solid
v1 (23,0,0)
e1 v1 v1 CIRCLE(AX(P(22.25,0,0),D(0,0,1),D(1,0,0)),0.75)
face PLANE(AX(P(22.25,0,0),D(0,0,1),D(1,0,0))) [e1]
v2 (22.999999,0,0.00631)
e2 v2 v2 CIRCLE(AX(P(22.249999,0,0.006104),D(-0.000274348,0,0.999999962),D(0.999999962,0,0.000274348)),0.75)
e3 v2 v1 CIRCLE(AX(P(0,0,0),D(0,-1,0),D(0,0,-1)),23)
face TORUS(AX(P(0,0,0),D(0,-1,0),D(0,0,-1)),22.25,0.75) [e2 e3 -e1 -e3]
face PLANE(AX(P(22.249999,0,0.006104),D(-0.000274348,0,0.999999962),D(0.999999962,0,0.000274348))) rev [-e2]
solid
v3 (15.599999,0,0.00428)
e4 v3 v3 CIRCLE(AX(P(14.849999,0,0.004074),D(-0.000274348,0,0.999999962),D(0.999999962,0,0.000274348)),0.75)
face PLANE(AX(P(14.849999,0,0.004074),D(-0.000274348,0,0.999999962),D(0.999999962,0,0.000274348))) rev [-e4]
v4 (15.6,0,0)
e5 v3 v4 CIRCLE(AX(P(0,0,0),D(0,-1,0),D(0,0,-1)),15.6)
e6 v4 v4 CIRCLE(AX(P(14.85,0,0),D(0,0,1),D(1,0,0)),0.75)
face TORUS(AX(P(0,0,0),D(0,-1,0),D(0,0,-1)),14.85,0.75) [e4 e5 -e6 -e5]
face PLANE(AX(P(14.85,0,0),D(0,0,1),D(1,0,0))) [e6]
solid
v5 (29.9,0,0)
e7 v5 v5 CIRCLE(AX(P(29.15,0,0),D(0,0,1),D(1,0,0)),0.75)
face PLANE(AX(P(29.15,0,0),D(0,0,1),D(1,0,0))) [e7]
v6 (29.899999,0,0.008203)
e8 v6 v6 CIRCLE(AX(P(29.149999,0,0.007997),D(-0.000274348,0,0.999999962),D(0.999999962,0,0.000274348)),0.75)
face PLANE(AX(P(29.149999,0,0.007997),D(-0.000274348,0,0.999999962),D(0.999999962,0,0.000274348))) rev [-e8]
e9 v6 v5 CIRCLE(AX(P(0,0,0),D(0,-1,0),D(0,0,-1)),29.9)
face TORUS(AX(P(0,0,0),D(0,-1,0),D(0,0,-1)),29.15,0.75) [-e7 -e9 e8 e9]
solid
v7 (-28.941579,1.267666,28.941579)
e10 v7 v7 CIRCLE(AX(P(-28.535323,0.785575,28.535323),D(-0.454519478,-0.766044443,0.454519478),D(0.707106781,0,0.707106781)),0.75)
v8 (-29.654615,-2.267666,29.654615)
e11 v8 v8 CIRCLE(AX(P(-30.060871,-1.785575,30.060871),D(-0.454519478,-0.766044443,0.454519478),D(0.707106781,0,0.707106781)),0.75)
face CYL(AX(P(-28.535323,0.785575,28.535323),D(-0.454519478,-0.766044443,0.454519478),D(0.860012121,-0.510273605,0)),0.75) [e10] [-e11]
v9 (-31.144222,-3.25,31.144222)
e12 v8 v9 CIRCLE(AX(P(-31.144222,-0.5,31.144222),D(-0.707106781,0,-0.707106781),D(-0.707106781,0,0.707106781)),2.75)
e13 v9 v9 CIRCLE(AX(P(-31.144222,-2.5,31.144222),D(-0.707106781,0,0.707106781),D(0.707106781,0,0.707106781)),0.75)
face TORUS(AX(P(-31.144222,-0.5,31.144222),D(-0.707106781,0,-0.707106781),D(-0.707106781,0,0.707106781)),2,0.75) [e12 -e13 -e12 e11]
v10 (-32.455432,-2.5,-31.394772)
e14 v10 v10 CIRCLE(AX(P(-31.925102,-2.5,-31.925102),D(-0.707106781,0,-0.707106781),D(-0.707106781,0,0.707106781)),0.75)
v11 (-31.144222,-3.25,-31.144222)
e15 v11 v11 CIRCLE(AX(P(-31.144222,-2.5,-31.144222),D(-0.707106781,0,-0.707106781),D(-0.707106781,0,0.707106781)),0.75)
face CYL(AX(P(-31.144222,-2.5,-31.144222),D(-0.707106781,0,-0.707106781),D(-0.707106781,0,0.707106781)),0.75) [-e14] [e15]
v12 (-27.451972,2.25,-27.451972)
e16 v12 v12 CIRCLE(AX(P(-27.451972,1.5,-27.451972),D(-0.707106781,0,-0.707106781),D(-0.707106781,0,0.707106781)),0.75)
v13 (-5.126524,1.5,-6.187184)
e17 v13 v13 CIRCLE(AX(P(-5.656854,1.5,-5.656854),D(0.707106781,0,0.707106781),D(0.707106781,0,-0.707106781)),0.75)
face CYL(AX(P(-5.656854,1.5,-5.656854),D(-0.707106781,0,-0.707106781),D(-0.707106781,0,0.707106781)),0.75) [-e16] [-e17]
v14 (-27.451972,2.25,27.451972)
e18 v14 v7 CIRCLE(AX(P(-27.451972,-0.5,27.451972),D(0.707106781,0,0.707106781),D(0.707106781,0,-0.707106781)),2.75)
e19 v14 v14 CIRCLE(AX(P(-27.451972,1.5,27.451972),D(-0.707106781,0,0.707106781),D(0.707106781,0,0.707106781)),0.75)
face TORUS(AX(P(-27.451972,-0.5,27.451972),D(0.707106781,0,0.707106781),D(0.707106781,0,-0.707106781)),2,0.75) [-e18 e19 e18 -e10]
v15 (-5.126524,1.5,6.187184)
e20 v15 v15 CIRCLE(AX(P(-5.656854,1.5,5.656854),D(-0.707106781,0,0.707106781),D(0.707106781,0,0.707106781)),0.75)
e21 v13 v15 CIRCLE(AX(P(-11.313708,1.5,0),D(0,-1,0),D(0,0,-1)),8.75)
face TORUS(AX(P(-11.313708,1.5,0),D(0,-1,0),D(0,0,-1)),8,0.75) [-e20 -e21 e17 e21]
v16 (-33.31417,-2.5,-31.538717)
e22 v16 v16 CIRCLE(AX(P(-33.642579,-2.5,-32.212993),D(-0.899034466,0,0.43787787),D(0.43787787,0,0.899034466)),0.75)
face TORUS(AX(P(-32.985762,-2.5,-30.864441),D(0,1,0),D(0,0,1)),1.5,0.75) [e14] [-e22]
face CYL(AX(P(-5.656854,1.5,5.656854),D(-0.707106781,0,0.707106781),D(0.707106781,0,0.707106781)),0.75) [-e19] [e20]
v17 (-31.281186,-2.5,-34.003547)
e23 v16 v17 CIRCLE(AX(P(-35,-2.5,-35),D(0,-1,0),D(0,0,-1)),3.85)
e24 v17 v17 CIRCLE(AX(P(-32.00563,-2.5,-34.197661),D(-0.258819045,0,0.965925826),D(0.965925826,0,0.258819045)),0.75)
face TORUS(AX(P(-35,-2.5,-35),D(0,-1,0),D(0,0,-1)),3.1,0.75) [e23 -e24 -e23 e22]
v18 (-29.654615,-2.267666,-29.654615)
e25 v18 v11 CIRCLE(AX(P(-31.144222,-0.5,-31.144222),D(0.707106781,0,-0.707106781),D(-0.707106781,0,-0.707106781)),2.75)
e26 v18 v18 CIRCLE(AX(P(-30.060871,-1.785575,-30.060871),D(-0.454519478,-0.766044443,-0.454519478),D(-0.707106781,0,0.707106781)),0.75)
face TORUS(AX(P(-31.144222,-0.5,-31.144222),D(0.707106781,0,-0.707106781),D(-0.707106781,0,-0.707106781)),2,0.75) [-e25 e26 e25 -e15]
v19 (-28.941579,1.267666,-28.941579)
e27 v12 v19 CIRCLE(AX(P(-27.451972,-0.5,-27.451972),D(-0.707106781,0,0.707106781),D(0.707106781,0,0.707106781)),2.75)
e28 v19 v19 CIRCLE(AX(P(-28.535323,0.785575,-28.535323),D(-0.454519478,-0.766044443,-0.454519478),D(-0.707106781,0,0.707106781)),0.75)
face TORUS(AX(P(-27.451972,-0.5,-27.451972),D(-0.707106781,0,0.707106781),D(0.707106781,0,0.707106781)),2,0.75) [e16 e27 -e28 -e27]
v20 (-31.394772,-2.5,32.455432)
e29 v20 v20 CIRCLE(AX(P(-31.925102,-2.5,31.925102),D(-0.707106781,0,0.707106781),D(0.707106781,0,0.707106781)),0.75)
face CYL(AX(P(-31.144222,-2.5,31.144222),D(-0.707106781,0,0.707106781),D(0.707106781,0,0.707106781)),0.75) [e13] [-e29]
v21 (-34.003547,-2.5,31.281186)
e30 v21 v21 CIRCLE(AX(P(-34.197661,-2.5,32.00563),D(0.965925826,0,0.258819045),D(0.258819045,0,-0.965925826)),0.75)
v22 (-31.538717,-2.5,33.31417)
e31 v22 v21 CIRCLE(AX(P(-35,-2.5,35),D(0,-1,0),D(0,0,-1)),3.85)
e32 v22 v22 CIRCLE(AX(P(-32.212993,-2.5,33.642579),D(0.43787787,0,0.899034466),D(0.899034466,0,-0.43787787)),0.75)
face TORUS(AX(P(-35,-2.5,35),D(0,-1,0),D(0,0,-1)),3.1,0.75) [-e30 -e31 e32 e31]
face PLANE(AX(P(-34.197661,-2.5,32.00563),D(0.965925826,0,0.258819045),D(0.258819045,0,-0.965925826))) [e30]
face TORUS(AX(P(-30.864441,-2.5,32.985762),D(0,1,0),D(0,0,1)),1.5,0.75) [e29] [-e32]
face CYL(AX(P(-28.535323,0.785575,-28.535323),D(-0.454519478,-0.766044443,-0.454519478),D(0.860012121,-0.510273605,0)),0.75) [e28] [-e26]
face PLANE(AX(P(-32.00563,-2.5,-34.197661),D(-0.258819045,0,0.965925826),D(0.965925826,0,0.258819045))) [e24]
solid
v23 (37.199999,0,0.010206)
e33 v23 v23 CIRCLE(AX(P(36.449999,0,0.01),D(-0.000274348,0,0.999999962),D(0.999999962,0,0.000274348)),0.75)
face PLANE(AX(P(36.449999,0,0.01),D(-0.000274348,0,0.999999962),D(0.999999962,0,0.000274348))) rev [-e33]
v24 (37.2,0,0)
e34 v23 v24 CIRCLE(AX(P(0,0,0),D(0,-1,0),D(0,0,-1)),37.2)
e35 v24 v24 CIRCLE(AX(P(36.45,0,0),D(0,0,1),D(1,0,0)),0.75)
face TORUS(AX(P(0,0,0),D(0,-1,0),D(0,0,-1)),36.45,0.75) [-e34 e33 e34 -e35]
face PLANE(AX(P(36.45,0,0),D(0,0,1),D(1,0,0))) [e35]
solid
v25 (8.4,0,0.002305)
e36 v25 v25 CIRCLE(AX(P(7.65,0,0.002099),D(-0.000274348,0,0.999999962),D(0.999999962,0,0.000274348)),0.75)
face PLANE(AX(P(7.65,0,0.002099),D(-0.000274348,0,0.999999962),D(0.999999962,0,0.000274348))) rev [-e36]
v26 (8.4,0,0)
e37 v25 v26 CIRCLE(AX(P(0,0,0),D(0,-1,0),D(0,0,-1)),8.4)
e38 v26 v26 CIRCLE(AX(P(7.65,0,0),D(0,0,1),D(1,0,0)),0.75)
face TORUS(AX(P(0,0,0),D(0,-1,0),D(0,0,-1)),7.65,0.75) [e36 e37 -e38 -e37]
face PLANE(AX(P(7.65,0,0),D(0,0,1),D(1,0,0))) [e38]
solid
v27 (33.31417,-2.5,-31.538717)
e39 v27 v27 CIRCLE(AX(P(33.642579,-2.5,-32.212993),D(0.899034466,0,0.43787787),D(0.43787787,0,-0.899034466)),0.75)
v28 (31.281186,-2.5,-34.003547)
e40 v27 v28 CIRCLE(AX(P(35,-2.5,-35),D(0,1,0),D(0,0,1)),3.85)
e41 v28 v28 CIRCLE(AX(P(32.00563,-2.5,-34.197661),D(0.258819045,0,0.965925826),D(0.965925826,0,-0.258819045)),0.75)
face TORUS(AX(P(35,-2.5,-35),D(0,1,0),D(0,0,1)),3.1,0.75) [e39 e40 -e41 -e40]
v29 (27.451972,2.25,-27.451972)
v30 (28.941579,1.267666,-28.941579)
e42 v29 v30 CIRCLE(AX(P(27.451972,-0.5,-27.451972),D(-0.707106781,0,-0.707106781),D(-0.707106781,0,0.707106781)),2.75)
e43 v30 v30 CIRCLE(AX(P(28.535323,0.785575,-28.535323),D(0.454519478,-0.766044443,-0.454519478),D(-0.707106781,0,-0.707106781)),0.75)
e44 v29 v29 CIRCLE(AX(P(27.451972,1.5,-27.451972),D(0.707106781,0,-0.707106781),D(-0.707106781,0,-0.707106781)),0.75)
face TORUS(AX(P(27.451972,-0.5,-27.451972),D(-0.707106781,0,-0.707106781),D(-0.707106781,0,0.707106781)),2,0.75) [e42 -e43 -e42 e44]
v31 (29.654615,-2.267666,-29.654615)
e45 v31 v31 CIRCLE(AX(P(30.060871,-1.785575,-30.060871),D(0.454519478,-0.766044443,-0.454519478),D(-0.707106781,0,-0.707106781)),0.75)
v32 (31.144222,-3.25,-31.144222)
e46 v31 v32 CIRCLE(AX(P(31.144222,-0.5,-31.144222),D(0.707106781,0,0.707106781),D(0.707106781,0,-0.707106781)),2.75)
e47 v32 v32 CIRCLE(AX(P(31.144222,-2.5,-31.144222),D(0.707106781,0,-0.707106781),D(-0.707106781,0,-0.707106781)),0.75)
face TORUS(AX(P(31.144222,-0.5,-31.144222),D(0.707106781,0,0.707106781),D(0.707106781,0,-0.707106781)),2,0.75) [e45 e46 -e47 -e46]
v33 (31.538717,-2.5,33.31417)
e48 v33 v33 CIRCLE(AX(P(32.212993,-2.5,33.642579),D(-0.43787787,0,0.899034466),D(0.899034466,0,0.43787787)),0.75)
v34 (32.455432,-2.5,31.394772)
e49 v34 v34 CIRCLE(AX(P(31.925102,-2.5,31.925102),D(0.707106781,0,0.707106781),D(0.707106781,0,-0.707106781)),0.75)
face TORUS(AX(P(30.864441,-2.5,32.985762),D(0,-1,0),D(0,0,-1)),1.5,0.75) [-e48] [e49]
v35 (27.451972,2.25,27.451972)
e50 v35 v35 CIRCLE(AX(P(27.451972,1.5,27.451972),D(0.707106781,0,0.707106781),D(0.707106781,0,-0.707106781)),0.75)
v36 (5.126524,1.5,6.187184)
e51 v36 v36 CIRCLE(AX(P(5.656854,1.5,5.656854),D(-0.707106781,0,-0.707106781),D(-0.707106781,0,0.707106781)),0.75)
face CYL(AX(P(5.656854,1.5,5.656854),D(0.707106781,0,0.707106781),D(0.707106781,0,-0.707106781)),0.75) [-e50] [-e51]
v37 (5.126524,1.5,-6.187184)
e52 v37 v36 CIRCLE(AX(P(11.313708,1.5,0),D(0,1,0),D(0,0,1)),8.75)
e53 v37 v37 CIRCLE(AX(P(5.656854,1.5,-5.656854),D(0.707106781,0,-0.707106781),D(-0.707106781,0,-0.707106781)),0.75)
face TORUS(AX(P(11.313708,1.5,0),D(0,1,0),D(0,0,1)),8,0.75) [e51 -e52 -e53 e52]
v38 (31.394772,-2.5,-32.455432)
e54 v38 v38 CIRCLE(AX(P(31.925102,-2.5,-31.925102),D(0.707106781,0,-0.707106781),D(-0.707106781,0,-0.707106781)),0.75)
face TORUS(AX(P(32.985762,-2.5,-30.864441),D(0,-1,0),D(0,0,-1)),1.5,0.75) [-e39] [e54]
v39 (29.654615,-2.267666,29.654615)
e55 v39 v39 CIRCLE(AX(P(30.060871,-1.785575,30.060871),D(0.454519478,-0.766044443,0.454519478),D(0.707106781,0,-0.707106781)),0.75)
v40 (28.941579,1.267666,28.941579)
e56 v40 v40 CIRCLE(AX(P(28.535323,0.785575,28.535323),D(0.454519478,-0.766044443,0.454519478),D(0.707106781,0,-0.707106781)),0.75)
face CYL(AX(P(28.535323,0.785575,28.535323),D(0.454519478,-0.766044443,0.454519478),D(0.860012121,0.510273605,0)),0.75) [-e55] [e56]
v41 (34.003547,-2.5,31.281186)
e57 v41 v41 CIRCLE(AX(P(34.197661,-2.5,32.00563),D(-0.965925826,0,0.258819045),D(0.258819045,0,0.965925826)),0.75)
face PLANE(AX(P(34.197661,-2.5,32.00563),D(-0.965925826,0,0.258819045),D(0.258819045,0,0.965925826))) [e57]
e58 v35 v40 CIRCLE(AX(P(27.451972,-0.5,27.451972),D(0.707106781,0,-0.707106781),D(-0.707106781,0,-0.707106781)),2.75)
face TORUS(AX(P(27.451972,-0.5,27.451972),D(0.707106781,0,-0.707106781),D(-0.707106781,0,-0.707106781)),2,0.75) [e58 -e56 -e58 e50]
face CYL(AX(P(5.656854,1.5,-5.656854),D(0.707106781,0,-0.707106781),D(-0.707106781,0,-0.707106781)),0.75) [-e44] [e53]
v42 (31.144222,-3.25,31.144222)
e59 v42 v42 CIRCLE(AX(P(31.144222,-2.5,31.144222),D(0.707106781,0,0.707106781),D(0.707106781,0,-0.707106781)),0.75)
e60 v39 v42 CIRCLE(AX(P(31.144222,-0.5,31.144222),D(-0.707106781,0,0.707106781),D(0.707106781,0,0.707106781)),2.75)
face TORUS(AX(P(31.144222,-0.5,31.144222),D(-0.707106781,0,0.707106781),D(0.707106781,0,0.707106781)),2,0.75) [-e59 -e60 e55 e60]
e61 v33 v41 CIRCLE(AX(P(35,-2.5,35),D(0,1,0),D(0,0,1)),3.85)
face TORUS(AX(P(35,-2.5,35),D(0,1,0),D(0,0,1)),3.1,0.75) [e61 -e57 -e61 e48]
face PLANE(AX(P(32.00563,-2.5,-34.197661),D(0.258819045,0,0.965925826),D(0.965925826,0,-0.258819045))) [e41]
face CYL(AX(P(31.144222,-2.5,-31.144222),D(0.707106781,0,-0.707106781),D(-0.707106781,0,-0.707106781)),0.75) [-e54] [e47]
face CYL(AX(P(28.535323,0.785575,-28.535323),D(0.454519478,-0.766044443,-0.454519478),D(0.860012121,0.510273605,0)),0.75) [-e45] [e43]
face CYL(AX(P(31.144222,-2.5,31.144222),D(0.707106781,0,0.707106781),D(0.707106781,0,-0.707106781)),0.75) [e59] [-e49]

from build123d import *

# Parameters (mm, degrees)
BALAYAGE2_OUTLINE_R = 0.75
BALAYAGE2_ANGLE     = 359.984281
ESQUISSE4_R         = 0.75
ESQUISSE5_R         = 0.75
ESQUISSE7_R         = 0.75
ESQUISSE8_R         = 0.75
ESQUISSE11_R        = 0.75
ESQUISSE13_R        = 0.75
ESQUISSE19_R        = 0.75
ESQUISSE15_R        = 0.75
ESQUISSE20_R        = 0.75
ESQUISSE21_R        = 0.75


# Read off the part's stored shape, not the designer's step: Balayage2
with BuildPart() as part:
    # Balayage2 outline → Balayage2 (revolve)
    with BuildSketch(Plane.XY):
        with Locations((22.25, 0)):
            Circle(BALAYAGE2_OUTLINE_R)
        with Locations((29.15, 0)):
            Circle(BALAYAGE2_OUTLINE_R)
        with Locations((14.85, 0)):
            Circle(BALAYAGE2_OUTLINE_R)
        with Locations((36.45, 0)):
            Circle(BALAYAGE2_OUTLINE_R)
        with Locations((7.65, 0)):
            Circle(BALAYAGE2_OUTLINE_R)
    revolve(axis=Axis((0, 0, 0), (0, 1, 0)), revolution_arc=BALAYAGE2_ANGLE)


with BuildPart() as body_2:
    # Balayage3: sweep along a path in Esquisse3
    with BuildLine(Plane(origin=(0, 1.5, 0), x_dir=(-1, 0, 0), z_dir=(0, 1, 0))) as balayage3_path:
        Line((-27, -27), (-5.656854249, -5.656854249))
        ThreePointArc((-5.656854249, -5.656854249), (-3.313708499, 0), (-5.656854249, 5.656854249))
        Line((-5.656854249, 5.656854249), (-27, 27))
    # Esquisse4 → Balayage3 (sweep)
    with BuildSketch(Plane(origin=(27, 0, -27), x_dir=(-0.7071067811865488, 0, -0.7071067811865462), z_dir=(0.7071067811865462, 0, -0.7071067811865488))):
        with Locations((0, 1.5)):
            Circle(ESQUISSE4_R)
    sweep(path=balayage3_path.line)

    # Balayage14: sweep along a path in Esquisse9
    with BuildLine(Plane(origin=(0, 0, 0), x_dir=(0.7071067811865488, 0, -0.7071067811865462), z_dir=(0.7071067811865462, 0, 0.7071067811865488))) as balayage14_path:
        Line((38.183766184, 1.5), (38.822951605, 1.5))
        ThreePointArc((38.822951605, 1.5), (39.668188129, 1.312615574), (40.355040492, 0.785575219))
        Line((40.355040492, 0.785575219), (42.512491877, -1.785575219))
        ThreePointArc((42.512491877, -1.785575219), (43.199344239, -2.312615574), (44.044580763, -2.5))
        Line((44.044580763, -2.5), (44.683766184, -2.5))
    # Esquisse8 → Balayage14 (sweep)
    with BuildSketch(Plane(origin=(27, 0, -27), x_dir=(-0.7071067811865488, 0, -0.7071067811865462), z_dir=(0.7071067811865462, 0, -0.7071067811865488))):
        with Locations((0, 1.5)):
            Circle(ESQUISSE8_R)
    sweep(path=balayage14_path.line)

    # Balayage16: sweep along a path in Esquisse12
    with BuildLine(Plane(origin=(0, 0, 0), x_dir=(-0.7071067811865488, 0, -0.7071067811865462), z_dir=(0.7071067811865462, 0, -0.7071067811865488))) as balayage16_path:
        Line((-38.183766184, 1.5), (-38.822951605, 1.5))
        ThreePointArc((-38.822951605, 1.5), (-39.668188129, 1.312615574), (-40.355040492, 0.785575219))
        Line((-40.355040492, 0.785575219), (-42.512491877, -1.785575219))
        ThreePointArc((-42.512491877, -1.785575219), (-43.199344239, -2.312615574), (-44.044580763, -2.5))
        Line((-44.044580763, -2.5), (-44.683766184, -2.5))
    # Esquisse13 → Balayage16 (sweep)
    with BuildSketch(Plane(origin=(27, 0, 27), x_dir=(0.7071067811865457, 0, -0.7071067811865495), z_dir=(0.7071067811865495, 0, 0.7071067811865457))):
        with Locations((0, 1.5)):
            Circle(ESQUISSE13_R)
    sweep(path=balayage16_path.line)

    # Balayage18: sweep along a path in Esquisse16
    with BuildLine(Plane(origin=(0, -2.5, 0), x_dir=(-1, 0, 0), z_dir=(0, 1, 0))) as balayage18_path:
        Line((-31.596194078, 31.596194078), (-31.925101628, 31.925101628))
        ThreePointArc((-31.925101628, 31.925101628), (-32.343801875, 32.737784484), (-32.212993155, 33.642578604))
        ThreePointArc((-32.212993155, 33.642578604), (-36.972498721, 37.391495096), (-34.19766096, 32.005629939))
    # Esquisse19 → Balayage18 (sweep)
    with BuildSketch(Plane(origin=(31.596194078, 0, 31.596194078), x_dir=(0.7071067811865456, 0, -0.7071067811865495), z_dir=(0.7071067811865495, 0, 0.7071067811865456))):
        with Locations((0, -2.5)):
            Circle(ESQUISSE19_R)
    sweep(path=balayage18_path.line)

    # Balayage20: sweep along a path in Esquisse17
    with BuildLine(Plane(origin=(0, -2.5, 0), x_dir=(-1, 0, 0), z_dir=(0, 1, 0))) as balayage20_path:
        Line((-31.596194078, -31.596194078), (-31.925101628, -31.925101628))
        ThreePointArc((-31.925101628, -31.925101628), (-32.737784484, -32.343801875), (-33.642578604, -32.212993155))
        ThreePointArc((-33.642578604, -32.212993155), (-37.391495096, -36.972498721), (-32.005629939, -34.19766096))
    # Esquisse20 → Balayage20 (sweep)
    with BuildSketch(Plane(origin=(31.596194078, 0, -31.596194078), x_dir=(-0.7071067811865488, 0, -0.7071067811865462), z_dir=(0.7071067811865462, 0, -0.7071067811865488))):
        with Locations((0, -2.5)):
            Circle(ESQUISSE20_R)
    sweep(path=balayage20_path.line)


with BuildPart() as body_3:
    # Balayage6: sweep along a path in Esquisse3<5>
    with BuildLine(Plane(origin=(0, 1.5, 0), x_dir=(-1, 0, 0), z_dir=(0, 1, 0))) as balayage6_path:
        Line((27, 27), (5.656854249, 5.656854249))
        ThreePointArc((5.656854249, 5.656854249), (3.313708499, 0), (5.656854249, -5.656854249))
        Line((5.656854249, -5.656854249), (27, -27))
    # Esquisse5 → Balayage6 (sweep)
    with BuildSketch(Plane(origin=(-27, 0, -27), x_dir=(0.7071067811865488, 0, -0.7071067811865462), z_dir=(0.7071067811865462, 0, 0.7071067811865488))):
        with Locations((0, 1.5)):
            Circle(ESQUISSE5_R)
    sweep(path=balayage6_path.line)

    # Balayage8: sweep along a path in Esquisse6
    with BuildLine(Plane(origin=(0, 0, 0), x_dir=(0.7071067811865488, 0, -0.7071067811865462), z_dir=(0.7071067811865462, 0, 0.7071067811865488))) as balayage8_path:
        Line((-38.183766184, 1.5), (-38.822951605, 1.5))
        ThreePointArc((-38.822951605, 1.5), (-39.668188129, 1.312615574), (-40.355040492, 0.785575219))
        Line((-40.355040492, 0.785575219), (-42.512491877, -1.785575219))
        ThreePointArc((-42.512491877, -1.785575219), (-43.199344239, -2.312615574), (-44.044580763, -2.5))
        Line((-44.044580763, -2.5), (-44.683766184, -2.5))
    # Esquisse7 → Balayage8 (sweep)
    with BuildSketch(Plane(origin=(-27, 0, 27), x_dir=(0.7071067811865449, 0, 0.7071067811865502), z_dir=(-0.7071067811865502, 0, 0.7071067811865449))):
        with Locations((0, 1.5)):
            Circle(ESQUISSE7_R)
    sweep(path=balayage8_path.line)

    # Balayage15: sweep along a path in Esquisse10
    with BuildLine(Plane(origin=(0, 0, 0), x_dir=(-0.7071067811865488, 0, -0.7071067811865462), z_dir=(0.7071067811865462, 0, -0.7071067811865488))) as balayage15_path:
        Line((38.183766184, 1.5), (38.822951605, 1.5))
        ThreePointArc((38.822951605, 1.5), (39.668188129, 1.312615574), (40.355040492, 0.785575219))
        Line((40.355040492, 0.785575219), (42.512491877, -1.785575219))
        ThreePointArc((42.512491877, -1.785575219), (43.199344239, -2.312615574), (44.044580763, -2.5))
        Line((44.044580763, -2.5), (44.683766184, -2.5))
    # Esquisse11 → Balayage15 (sweep)
    with BuildSketch(Plane(origin=(-27, 0, -27), x_dir=(-0.7071067811865488, 0, 0.7071067811865462), z_dir=(-0.7071067811865462, 0, -0.7071067811865488))):
        with Locations((0, 1.5)):
            Circle(ESQUISSE11_R)
    sweep(path=balayage15_path.line)

    # Balayage19: sweep along a path in Esquisse14
    with BuildLine(Plane(origin=(0, -2.5, 0), x_dir=(-1, 0, 0), z_dir=(0, 1, 0))) as balayage19_path:
        Line((31.596194078, 31.596194078), (31.925101628, 31.925101628))
        ThreePointArc((31.925101628, 31.925101628), (32.343801875, 32.737784484), (32.212993155, 33.642578604))
        ThreePointArc((32.212993155, 33.642578604), (36.972498721, 37.391495096), (34.19766096, 32.005629939))
    # Esquisse15 → Balayage19 (sweep)
    with BuildSketch(Plane(origin=(-31.596194078, 0, 31.596194078), x_dir=(0.7071067811865449, 0, 0.7071067811865501), z_dir=(-0.7071067811865501, 0, 0.7071067811865449))):
        with Locations((0, -2.5)):
            Circle(ESQUISSE15_R)
    sweep(path=balayage19_path.line)

    # Balayage21: sweep along a path in Esquisse18
    with BuildLine(Plane(origin=(0, -2.5, 0), x_dir=(-1, 0, 0), z_dir=(0, 1, 0))) as balayage21_path:
        Line((31.596194078, -31.596194078), (31.925101628, -31.925101628))
        ThreePointArc((31.925101628, -31.925101628), (32.737784484, -32.343801875), (33.642578604, -32.212993155))
        ThreePointArc((33.642578604, -32.212993155), (37.391495096, -36.972498721), (32.005629939, -34.19766096))
    # Esquisse21 → Balayage21 (sweep)
    with BuildSketch(Plane(origin=(-31.596194078, 0, -31.596194078), x_dir=(-0.7071067811865488, 0, 0.7071067811865462), z_dir=(-0.7071067811865462, 0, -0.7071067811865488))):
        with Locations((0, -2.5)):
            Circle(ESQUISSE21_R)
    sweep(path=balayage21_path.line)


solid = Compound([part.part, body_2.part, body_3.part])
